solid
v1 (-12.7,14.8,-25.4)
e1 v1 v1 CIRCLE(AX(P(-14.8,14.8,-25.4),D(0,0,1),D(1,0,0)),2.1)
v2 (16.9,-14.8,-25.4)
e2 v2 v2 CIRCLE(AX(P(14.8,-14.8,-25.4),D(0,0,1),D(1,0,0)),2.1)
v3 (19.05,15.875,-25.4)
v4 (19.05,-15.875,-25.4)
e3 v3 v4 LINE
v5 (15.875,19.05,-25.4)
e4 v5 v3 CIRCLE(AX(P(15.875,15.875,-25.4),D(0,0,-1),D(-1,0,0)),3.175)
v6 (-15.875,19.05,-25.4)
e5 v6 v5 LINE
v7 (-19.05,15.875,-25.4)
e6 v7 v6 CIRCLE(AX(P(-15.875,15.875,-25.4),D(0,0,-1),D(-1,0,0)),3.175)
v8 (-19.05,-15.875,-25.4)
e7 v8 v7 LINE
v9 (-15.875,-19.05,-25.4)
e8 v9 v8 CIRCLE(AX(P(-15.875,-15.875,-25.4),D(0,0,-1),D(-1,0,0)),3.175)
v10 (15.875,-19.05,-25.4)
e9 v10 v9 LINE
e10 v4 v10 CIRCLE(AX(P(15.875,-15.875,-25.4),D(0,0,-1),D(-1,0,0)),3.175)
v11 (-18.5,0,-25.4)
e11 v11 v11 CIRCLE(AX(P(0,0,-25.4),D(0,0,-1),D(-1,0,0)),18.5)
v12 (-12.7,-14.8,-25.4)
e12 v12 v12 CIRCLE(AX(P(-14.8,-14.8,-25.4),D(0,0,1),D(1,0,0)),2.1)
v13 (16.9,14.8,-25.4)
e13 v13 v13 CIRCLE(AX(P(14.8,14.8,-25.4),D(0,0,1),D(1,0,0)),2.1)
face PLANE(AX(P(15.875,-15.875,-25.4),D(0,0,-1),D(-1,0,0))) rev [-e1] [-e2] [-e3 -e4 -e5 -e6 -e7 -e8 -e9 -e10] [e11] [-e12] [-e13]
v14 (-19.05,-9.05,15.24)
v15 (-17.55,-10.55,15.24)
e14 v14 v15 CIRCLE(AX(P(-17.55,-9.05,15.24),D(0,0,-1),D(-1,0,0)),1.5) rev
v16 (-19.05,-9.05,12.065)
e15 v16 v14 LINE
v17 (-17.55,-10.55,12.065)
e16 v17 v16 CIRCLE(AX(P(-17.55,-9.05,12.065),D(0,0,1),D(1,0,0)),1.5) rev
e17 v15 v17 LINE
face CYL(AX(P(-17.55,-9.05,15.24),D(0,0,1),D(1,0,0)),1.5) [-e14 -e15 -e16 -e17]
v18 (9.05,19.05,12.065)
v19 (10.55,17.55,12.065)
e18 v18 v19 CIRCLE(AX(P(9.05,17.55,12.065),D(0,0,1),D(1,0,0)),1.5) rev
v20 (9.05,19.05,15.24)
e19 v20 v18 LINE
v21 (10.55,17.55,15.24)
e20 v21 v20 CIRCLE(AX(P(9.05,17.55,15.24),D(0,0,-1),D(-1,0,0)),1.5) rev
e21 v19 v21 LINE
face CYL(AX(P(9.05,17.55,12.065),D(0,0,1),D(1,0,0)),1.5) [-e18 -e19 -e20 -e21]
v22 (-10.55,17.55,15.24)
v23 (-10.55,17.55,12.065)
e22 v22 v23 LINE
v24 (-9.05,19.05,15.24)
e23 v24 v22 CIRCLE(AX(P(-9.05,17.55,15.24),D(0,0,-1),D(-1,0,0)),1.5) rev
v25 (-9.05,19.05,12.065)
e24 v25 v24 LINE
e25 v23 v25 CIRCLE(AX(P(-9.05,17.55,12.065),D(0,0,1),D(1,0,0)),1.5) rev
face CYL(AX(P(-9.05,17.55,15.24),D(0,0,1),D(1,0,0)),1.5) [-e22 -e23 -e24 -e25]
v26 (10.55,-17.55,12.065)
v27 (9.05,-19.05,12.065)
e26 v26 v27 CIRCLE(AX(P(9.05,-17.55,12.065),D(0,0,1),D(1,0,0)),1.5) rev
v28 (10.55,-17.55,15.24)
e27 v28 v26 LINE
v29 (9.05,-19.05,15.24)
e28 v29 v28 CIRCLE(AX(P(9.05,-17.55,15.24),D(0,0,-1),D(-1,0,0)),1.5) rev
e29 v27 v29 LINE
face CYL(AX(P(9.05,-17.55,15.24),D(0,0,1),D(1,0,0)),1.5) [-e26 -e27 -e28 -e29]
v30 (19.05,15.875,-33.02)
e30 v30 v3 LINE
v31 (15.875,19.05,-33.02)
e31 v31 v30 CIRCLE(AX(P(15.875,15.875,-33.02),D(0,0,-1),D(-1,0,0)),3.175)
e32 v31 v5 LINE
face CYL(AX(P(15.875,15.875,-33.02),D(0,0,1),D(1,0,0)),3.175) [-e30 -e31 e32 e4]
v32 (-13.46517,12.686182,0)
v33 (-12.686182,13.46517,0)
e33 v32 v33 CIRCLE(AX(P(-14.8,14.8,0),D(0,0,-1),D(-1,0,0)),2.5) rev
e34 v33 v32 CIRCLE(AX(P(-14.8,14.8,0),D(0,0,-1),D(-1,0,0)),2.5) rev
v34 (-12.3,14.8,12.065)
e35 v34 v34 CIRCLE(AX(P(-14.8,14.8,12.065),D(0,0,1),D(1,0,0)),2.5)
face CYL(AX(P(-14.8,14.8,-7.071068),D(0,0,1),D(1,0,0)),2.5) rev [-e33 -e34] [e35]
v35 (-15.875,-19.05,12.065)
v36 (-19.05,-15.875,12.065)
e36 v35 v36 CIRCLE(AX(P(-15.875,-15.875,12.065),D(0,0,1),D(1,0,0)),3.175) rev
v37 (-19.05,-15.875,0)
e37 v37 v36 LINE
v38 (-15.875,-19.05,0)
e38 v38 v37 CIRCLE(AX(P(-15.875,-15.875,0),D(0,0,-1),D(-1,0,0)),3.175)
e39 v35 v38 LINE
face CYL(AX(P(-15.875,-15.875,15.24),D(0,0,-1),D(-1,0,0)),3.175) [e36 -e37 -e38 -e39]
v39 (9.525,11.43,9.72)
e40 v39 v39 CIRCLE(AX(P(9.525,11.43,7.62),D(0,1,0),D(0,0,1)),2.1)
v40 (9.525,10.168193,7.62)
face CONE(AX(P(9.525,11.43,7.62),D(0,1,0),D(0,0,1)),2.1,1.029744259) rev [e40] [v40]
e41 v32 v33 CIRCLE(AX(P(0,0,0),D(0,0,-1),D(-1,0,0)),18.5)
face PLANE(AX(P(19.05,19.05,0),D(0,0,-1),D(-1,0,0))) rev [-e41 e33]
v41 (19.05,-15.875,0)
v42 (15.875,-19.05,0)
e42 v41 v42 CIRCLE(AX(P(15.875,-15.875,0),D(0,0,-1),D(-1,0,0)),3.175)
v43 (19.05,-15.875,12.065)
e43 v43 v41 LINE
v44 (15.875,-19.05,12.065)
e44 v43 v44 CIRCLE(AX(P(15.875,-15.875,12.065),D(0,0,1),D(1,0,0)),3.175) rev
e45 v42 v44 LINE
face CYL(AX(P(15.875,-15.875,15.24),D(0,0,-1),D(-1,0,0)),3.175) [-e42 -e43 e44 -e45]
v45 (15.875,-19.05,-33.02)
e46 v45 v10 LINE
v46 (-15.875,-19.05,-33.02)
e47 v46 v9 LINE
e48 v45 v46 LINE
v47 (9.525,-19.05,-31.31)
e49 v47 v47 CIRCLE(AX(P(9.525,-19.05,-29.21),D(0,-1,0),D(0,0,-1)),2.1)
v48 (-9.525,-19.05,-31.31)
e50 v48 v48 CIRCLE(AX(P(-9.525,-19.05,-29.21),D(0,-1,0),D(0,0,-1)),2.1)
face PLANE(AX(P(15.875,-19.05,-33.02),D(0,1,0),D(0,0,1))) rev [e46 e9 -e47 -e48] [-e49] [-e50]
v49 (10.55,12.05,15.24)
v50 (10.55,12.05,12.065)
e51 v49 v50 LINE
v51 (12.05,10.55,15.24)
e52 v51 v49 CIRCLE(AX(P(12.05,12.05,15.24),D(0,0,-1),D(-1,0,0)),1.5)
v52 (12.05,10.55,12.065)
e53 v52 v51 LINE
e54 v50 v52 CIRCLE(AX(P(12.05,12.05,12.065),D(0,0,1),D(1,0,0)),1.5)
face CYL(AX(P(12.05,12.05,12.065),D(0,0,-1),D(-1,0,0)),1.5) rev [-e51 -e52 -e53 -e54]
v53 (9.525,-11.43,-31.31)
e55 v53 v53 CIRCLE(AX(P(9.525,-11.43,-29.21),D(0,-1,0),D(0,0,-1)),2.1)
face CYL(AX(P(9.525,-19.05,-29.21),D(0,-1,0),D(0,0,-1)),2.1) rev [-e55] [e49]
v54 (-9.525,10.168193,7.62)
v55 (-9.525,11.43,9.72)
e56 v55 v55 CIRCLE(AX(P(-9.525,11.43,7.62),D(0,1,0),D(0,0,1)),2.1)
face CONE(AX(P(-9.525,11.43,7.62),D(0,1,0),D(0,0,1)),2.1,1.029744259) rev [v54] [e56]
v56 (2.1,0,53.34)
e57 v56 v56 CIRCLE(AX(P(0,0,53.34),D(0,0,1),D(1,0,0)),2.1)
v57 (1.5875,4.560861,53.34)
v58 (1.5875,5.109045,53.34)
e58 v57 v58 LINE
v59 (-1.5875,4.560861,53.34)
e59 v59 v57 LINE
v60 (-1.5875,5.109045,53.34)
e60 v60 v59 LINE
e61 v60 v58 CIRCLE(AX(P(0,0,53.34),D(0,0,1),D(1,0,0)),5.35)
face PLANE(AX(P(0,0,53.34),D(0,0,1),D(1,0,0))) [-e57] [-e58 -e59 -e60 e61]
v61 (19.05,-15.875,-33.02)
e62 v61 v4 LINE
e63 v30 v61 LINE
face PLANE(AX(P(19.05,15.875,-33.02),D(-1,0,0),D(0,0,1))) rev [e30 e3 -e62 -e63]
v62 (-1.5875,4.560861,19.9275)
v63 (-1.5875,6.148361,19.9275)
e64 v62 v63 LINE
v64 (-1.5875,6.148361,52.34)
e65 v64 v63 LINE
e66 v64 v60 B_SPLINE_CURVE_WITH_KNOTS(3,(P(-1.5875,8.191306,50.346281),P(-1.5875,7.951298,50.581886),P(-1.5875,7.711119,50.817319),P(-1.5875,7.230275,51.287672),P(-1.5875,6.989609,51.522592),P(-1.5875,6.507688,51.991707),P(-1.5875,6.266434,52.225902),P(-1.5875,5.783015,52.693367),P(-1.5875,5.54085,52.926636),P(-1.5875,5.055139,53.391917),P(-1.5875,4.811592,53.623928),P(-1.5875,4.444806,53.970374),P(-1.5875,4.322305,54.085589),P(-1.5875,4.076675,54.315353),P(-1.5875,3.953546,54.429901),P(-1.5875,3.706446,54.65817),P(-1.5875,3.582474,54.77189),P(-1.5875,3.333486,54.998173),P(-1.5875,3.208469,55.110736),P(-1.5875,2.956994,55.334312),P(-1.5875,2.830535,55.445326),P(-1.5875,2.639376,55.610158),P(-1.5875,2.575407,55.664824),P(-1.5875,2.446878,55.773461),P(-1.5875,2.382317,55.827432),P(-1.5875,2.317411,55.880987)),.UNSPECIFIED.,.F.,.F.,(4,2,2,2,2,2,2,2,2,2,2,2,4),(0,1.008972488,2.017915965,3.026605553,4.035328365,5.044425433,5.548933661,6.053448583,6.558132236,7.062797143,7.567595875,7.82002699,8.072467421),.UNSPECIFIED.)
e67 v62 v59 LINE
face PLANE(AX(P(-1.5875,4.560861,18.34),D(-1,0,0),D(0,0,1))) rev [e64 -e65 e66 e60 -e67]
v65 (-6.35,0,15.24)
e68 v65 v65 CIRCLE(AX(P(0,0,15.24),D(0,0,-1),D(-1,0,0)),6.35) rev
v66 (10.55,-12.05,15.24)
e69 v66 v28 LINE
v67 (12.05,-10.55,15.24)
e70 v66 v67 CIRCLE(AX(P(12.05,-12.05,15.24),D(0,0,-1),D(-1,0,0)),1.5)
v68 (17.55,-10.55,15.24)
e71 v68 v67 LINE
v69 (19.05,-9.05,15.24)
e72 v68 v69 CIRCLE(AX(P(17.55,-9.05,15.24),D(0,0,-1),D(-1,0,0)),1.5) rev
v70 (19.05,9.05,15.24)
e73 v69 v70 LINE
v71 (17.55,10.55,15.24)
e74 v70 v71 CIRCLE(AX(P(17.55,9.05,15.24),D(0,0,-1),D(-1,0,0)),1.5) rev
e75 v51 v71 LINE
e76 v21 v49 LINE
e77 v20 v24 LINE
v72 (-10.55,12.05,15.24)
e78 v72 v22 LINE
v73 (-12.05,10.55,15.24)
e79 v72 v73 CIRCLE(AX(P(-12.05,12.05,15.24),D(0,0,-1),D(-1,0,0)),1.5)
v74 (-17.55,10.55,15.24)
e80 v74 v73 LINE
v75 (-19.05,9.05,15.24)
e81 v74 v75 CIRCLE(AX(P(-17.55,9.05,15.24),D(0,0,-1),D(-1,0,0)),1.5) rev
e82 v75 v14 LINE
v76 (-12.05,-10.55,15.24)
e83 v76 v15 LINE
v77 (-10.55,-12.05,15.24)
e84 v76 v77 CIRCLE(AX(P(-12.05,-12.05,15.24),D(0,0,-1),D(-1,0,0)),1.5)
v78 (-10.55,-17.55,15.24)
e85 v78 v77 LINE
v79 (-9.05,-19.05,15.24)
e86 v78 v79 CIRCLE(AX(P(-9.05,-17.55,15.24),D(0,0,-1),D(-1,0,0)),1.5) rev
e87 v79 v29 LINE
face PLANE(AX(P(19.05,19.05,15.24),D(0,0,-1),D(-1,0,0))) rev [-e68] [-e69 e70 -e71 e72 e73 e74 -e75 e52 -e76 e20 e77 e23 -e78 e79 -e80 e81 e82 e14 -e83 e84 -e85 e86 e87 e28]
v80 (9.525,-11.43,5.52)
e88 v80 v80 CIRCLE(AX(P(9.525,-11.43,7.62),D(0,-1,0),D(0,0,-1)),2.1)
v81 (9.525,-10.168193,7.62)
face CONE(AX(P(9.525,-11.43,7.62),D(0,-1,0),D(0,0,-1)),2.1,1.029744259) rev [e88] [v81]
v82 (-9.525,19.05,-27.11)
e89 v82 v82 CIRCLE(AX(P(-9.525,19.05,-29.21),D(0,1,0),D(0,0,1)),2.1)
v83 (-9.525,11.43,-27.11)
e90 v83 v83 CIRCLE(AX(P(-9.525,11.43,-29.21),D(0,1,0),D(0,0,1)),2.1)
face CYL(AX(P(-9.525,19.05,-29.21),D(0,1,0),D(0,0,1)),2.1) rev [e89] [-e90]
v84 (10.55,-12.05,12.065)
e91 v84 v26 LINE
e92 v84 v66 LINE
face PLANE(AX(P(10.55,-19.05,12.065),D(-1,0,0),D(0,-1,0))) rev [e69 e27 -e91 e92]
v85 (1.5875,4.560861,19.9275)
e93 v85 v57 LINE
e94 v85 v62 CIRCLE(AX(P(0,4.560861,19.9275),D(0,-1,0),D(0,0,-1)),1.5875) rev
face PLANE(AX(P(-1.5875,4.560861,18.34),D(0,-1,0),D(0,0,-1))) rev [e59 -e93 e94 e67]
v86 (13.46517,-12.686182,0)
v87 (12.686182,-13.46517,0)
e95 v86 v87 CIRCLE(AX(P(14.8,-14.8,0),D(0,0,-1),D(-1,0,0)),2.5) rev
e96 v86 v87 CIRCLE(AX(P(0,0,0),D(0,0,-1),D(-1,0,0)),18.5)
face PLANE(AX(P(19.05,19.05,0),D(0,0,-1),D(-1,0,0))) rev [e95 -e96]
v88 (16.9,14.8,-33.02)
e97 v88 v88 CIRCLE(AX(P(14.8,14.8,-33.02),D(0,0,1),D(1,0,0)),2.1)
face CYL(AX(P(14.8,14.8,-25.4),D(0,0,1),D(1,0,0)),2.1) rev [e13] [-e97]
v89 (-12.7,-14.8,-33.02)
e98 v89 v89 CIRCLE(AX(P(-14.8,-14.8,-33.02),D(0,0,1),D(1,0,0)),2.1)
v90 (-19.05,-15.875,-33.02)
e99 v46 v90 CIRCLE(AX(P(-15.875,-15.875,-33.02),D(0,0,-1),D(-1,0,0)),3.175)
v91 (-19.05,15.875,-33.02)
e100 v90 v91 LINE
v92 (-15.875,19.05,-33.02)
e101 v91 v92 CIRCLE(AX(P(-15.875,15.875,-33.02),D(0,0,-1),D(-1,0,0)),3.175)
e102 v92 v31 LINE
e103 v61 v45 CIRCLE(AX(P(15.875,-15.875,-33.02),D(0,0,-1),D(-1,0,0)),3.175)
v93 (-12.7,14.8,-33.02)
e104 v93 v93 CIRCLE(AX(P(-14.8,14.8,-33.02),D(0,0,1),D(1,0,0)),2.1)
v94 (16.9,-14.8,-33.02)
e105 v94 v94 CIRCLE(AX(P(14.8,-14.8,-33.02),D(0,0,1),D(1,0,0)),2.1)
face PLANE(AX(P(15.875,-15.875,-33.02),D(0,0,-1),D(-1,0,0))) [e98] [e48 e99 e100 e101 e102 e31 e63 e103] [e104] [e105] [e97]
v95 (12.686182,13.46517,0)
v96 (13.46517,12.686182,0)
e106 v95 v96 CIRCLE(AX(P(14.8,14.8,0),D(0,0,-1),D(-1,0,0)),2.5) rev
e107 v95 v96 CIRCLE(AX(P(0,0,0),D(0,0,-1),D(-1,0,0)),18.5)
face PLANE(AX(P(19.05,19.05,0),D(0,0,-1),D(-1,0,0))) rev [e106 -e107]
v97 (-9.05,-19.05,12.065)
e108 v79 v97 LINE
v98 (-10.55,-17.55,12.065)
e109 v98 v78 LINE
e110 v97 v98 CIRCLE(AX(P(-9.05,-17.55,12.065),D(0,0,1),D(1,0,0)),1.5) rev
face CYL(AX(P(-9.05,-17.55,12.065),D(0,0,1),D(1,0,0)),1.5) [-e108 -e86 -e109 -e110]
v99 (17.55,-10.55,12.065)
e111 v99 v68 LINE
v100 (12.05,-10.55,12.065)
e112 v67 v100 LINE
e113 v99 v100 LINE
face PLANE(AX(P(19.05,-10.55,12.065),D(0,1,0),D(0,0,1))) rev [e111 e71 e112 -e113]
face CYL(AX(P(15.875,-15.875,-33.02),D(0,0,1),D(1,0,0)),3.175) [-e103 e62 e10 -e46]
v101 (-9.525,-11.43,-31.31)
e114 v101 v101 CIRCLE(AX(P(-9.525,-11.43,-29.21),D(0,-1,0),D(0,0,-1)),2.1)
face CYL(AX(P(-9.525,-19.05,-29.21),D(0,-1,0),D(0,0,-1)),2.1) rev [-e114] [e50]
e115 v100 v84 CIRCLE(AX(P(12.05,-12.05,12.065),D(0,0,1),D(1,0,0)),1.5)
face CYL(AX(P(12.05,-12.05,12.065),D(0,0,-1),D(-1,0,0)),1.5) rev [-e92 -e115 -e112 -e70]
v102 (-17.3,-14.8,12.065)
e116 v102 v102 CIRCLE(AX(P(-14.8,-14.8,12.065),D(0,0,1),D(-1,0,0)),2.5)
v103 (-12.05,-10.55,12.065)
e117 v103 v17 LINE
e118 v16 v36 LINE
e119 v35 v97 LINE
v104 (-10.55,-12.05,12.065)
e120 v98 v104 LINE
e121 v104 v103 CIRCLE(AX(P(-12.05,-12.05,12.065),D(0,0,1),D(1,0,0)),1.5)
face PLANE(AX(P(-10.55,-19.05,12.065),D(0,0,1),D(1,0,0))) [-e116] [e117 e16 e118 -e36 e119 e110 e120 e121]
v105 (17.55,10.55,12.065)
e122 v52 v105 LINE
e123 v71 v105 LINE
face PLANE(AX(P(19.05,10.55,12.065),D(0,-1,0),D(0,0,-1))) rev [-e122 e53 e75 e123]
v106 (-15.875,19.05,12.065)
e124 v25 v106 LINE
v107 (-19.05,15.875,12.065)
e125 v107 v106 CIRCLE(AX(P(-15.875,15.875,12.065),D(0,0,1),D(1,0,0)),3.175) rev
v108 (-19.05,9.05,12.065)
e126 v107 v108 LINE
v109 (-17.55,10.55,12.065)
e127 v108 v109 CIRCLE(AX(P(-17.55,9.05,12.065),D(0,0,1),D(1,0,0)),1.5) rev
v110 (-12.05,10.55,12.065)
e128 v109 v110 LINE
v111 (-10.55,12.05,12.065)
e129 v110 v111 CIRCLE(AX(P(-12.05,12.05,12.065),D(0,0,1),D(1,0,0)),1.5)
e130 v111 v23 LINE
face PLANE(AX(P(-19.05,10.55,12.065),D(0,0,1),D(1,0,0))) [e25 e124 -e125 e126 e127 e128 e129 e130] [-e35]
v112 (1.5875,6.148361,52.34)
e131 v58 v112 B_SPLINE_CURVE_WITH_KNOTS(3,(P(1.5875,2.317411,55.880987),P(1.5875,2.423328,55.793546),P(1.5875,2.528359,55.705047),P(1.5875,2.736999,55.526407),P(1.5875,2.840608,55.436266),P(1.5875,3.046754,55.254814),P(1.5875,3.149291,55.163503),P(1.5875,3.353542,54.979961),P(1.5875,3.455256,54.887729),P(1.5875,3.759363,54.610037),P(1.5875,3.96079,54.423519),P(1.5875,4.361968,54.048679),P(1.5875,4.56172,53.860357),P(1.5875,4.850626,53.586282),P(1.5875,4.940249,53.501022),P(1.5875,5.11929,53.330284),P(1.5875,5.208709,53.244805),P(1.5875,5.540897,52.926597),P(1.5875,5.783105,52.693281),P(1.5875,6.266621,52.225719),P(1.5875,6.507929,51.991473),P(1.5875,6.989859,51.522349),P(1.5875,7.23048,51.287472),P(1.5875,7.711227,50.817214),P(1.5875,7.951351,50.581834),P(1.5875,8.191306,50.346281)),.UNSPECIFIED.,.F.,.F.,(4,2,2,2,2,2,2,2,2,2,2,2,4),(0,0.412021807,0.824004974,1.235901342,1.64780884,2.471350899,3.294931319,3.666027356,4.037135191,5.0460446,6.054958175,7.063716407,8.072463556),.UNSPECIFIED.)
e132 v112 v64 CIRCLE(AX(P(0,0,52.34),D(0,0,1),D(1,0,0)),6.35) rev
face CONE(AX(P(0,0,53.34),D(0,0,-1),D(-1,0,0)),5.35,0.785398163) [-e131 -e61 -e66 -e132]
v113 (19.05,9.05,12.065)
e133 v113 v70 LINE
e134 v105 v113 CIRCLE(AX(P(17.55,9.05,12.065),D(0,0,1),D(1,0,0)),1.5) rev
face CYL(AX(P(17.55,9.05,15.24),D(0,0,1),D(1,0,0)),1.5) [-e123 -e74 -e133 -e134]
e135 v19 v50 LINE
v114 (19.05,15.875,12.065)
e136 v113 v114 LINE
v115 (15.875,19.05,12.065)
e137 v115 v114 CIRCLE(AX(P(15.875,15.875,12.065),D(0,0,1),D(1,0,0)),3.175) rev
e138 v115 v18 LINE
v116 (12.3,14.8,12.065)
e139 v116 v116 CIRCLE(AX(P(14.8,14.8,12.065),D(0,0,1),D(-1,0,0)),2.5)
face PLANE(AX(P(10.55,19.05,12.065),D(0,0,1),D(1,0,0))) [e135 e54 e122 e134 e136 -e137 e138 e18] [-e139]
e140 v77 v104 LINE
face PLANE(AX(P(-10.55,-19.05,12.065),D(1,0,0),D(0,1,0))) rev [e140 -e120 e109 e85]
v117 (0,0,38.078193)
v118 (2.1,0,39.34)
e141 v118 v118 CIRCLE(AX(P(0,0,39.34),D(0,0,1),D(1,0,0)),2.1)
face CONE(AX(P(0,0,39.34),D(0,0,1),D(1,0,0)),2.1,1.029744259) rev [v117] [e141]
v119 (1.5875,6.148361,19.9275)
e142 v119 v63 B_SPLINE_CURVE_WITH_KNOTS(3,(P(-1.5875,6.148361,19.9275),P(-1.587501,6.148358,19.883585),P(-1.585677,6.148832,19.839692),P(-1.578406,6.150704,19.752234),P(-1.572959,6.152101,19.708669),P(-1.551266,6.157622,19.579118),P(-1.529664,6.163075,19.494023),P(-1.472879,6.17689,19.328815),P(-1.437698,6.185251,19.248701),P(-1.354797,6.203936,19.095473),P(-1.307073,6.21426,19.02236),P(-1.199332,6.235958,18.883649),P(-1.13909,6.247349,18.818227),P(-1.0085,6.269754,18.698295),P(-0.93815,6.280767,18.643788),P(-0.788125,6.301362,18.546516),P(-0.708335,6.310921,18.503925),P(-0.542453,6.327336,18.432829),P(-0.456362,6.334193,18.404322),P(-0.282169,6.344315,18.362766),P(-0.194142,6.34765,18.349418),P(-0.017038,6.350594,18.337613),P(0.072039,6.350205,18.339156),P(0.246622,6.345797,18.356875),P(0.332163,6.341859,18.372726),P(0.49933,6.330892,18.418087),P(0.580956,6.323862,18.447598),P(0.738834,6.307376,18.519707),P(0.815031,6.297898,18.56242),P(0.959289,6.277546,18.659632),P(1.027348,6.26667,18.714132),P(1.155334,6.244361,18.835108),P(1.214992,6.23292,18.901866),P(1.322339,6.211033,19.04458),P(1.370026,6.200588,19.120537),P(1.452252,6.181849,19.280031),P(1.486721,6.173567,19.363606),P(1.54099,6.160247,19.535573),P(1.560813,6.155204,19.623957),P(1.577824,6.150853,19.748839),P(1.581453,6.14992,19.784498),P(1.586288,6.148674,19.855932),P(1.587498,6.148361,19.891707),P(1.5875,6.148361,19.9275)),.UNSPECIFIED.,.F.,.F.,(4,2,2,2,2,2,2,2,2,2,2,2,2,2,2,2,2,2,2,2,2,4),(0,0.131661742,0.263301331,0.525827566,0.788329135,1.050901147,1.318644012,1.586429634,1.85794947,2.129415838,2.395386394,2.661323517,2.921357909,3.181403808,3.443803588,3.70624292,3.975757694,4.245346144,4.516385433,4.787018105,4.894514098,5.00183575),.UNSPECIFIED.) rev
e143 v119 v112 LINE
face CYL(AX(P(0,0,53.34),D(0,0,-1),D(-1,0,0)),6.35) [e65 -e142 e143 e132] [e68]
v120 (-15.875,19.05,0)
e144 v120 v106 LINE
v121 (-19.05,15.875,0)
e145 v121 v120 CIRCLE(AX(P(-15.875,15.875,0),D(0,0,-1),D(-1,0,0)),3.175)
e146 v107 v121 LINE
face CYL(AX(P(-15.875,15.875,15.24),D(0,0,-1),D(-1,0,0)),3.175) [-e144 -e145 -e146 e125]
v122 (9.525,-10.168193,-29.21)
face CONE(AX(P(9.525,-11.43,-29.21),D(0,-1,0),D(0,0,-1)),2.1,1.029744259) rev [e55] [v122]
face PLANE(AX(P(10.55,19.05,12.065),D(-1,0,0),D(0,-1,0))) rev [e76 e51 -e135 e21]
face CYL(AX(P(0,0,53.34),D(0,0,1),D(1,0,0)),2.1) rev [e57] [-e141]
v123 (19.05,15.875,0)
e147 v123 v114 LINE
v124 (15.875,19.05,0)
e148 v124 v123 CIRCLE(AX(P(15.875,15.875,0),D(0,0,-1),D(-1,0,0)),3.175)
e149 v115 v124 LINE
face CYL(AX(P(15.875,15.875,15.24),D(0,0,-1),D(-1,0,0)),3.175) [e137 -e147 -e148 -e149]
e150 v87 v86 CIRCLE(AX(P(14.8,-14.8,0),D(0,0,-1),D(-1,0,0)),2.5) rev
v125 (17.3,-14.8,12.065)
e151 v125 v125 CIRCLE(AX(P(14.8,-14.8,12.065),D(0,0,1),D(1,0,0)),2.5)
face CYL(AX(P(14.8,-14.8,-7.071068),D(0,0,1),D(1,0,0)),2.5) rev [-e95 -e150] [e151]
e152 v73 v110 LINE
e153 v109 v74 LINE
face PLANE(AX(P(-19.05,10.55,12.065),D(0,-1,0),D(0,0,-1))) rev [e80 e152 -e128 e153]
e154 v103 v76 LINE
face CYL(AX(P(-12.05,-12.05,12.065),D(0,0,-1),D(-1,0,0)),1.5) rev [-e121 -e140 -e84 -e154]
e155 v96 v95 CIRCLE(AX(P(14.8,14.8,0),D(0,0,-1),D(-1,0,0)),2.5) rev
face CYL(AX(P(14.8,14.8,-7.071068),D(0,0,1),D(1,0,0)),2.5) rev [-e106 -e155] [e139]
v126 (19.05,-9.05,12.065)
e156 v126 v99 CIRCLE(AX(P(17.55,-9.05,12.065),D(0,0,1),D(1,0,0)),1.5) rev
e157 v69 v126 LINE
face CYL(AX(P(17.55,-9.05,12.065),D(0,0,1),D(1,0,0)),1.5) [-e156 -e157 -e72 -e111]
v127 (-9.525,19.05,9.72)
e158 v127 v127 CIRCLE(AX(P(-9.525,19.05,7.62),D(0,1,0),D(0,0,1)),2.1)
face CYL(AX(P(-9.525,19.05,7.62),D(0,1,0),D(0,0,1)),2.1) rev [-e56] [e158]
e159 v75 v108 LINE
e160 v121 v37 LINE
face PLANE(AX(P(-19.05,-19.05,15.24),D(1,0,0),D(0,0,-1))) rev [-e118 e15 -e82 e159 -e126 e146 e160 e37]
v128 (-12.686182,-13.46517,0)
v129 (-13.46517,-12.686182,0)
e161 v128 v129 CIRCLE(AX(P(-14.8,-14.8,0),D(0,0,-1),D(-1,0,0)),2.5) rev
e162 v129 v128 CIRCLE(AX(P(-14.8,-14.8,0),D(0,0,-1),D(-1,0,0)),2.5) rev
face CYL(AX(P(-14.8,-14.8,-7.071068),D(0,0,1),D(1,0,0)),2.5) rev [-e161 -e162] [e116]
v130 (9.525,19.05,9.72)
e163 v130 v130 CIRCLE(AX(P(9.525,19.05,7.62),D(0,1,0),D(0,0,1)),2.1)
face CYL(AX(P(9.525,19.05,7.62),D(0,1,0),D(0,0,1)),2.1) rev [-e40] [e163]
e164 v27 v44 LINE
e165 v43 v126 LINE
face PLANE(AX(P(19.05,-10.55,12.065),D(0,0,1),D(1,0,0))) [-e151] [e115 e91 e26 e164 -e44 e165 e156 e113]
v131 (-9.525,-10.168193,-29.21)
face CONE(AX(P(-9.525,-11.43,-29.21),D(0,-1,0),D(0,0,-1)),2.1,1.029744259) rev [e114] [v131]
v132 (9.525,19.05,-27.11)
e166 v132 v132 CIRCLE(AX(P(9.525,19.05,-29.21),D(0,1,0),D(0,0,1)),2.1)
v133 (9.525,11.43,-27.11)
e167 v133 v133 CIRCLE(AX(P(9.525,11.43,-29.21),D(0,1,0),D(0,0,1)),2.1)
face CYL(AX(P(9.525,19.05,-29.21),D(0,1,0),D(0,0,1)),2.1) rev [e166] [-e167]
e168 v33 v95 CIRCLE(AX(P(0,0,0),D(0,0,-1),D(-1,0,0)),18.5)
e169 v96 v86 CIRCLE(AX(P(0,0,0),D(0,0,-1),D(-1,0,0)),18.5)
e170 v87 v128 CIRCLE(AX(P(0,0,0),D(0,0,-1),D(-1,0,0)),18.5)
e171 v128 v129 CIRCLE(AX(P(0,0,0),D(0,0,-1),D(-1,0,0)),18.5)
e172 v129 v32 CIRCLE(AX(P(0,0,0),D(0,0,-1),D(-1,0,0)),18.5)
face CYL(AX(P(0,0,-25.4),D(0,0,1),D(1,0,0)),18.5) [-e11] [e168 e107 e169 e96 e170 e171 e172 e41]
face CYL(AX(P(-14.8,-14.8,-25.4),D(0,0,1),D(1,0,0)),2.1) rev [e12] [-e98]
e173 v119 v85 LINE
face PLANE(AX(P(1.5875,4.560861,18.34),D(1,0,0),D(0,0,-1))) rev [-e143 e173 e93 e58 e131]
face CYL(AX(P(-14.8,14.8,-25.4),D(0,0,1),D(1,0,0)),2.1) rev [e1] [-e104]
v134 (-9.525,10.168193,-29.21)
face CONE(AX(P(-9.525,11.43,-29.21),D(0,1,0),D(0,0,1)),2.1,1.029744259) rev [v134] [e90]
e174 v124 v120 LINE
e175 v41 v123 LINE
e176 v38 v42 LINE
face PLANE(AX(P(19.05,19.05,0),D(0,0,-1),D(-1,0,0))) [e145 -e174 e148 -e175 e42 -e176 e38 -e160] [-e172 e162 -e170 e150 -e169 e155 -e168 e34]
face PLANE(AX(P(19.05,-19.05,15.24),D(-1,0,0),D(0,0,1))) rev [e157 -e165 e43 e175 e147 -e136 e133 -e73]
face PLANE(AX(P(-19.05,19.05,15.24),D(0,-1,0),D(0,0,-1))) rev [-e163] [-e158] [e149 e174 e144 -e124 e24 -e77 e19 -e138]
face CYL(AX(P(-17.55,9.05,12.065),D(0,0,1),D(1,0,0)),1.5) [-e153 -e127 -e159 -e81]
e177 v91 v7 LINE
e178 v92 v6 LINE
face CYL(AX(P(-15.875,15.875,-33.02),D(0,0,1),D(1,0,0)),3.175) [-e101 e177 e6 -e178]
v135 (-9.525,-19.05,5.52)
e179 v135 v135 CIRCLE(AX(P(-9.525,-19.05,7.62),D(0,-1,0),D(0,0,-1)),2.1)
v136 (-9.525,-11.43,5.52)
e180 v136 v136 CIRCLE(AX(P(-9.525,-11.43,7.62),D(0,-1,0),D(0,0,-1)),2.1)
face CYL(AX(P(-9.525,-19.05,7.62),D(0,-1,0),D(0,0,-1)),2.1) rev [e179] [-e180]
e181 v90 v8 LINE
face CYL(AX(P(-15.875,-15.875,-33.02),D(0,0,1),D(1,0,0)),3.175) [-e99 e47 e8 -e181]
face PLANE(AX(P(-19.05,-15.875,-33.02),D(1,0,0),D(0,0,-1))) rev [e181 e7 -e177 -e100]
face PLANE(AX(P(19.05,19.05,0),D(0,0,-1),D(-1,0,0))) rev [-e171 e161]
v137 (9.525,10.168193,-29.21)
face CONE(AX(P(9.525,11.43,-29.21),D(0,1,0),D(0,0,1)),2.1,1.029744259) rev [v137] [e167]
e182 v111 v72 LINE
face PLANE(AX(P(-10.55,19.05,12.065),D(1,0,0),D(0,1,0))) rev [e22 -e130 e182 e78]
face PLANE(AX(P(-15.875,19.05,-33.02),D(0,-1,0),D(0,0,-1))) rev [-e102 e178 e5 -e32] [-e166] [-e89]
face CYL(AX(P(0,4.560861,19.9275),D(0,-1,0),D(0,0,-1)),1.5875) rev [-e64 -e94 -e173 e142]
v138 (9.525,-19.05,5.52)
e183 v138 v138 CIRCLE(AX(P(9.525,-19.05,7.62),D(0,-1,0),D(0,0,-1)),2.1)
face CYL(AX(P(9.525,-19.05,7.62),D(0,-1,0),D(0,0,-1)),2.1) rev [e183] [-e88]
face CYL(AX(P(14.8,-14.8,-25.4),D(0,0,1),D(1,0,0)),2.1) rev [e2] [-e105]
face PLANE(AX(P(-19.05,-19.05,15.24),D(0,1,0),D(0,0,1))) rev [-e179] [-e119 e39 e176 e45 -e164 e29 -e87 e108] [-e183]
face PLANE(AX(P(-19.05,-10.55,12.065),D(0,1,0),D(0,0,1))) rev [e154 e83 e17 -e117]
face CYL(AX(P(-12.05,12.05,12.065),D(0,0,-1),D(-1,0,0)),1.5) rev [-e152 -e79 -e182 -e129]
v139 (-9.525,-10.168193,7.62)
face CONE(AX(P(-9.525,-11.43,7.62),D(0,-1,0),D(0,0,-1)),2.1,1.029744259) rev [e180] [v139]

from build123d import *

# Parameters (mm, degrees)
SKETCH1_W                      = 38.1
SKETCH1_H                      = 38.1
EXTRUDE1_DEPTH                 = 15.24
FILLET1_R                      = 3.175
SKETCH2_R                      = 6.35
EXTRUDE2_DEPTH                 = 38.1
CHAMFER1_SIZE                  = 1
SKETCH3_W                      = 3.175
SKETCH3_H                      = 3.175
EXTRUDE3_DEPTH                 = 35
FILLET2_R                      = 1.5875
M5X0_8_TAPPED_HOLE1_D          = 4.2
M5X0_8_TAPPED_HOLE1_DEPTH      = 14
M5X0_8_TAPPED_HOLE1_TIP        = 1.2618073
SKETCH7_R                      = 18.5
EXTRUDE4_DEPTH                 = 25.4
EXTRUDE5_DEPTH                 = 7.62
SKETCH9_W                      = 8.5
SKETCH9_H                      = 8.5
EXTRUDE7_DEPTH                 = 3.175
FILLET3_R                      = 1.5
SKETCH10_R                     = 2.5
EXTRUDE8_DEPTH                 = 12.065
M5X0_8_TAPPED_HOLE2_D          = 4.2
M5X0_8_TAPPED_HOLE3_AT_2_COUNT = 2
M5X0_8_TAPPED_HOLE3_AT_2_PITCH = 19.05
M5X0_8_TAPPED_HOLE3_AT_3_COUNT = 2
M5X0_8_TAPPED_HOLE3_AT_3_PITCH = 36.83
M5X0_8_TAPPED_HOLE3_AT_4_COUNT = 2
M5X0_8_TAPPED_HOLE3_AT_4_PITCH = 41.465062402


with BuildPart() as part:
    # Sketch1 → Extrude1 (new body)
    with BuildSketch(Plane.XY):
        Rectangle(SKETCH1_W, SKETCH1_H)
    extrude(amount=EXTRUDE1_DEPTH)

    # Fillet1
    fillet1_edges = [part.edges().sort_by_distance(p)[0] for p in [
        (19.05, -19.05, 7.62),
        (-19.05, -19.05, 7.62),
        (-19.05, 19.05, 7.62),
        (19.05, 19.05, 7.62),
    ]]
    fillet(fillet1_edges, radius=FILLET1_R)

    # Sketch2 → Extrude2 (add)
    with BuildSketch(Plane.XY.offset(15.24)):
        with Locations(Location((0, 0, 0), (0, 0, 180))):
            Circle(SKETCH2_R)
    extrude(amount=EXTRUDE2_DEPTH)

    # Chamfer1
    chamfer1_edges = [part.edges().sort_by_distance(p)[0] for p in [
        (6.35, 0, 53.34),
    ]]
    chamfer(chamfer1_edges, length=CHAMFER1_SIZE)

    # Sketch3 → Extrude3 (cut)
    with BuildSketch(Plane.XY.offset(53.34)):
        with Locations((0, 6.148361062)):
            Rectangle(SKETCH3_W, SKETCH3_H)
    extrude(amount=-EXTRUDE3_DEPTH, mode=Mode.SUBTRACT)

    # Fillet2
    fillet2_edges = [part.edges().sort_by_distance(p)[0] for p in [
        (1.5875, 5.354611062, 18.34),
        (-1.5875, 5.354611062, 18.34),
    ]]
    fillet(fillet2_edges, radius=FILLET2_R - 0.0001)  # a hair under: the kernel refuses the full size

    # M5x0.8 Tapped Hole1
    with Locations(Plane.XY.offset(53.34)):
        with Locations((0, 0)):
            Hole(M5X0_8_TAPPED_HOLE1_D / 2, depth=M5X0_8_TAPPED_HOLE1_DEPTH)
            with Locations((0, 0, -(M5X0_8_TAPPED_HOLE1_DEPTH + M5X0_8_TAPPED_HOLE1_TIP / 2))):  # 118° drill point
                Cone(0, M5X0_8_TAPPED_HOLE1_D / 2, M5X0_8_TAPPED_HOLE1_TIP, mode=Mode.SUBTRACT)

    # Sketch7 → Extrude4 (add)
    with BuildSketch(Plane(origin=(0, 0, 0), x_dir=(-1, 0, 0), z_dir=(0, 0, -1))):
        Circle(SKETCH7_R)
    extrude(amount=EXTRUDE4_DEPTH)

    # Sketch8 → Extrude5 (add)
    with BuildSketch(Plane(origin=(0, 0, -25.4), x_dir=(-1, 0, 0), z_dir=(0, 0, -1))):
        with BuildLine():
            Line((-15.875, -19.05), (15.875, -19.05))
            ThreePointArc((15.875, -19.05), (18.12006403, -18.12006403), (19.05, -15.875))
            Line((19.05, -15.875), (19.05, 15.875))
            ThreePointArc((19.05, 15.875), (18.12006403, 18.12006403), (15.875, 19.05))
            Line((15.875, 19.05), (-15.875, 19.05))
            ThreePointArc((-15.875, 19.05), (-18.12006403, 18.12006403), (-19.05, 15.875))
            Line((-19.05, 15.875), (-19.05, -15.875))
            ThreePointArc((-19.05, -15.875), (-18.12006403, -18.12006403), (-15.875, -19.05))
        make_face()
    extrude(amount=EXTRUDE5_DEPTH)

    # Sketch9 → Extrude7 (cut)
    with BuildSketch(Plane.XY.offset(15.24)):
        with Locations((-14.8, 14.8)):
            Rectangle(SKETCH9_W, SKETCH9_H)
        with Locations((14.8, 14.8)):
            Rectangle(SKETCH9_W, SKETCH9_H)
        with Locations((14.8, -14.8)):
            Rectangle(SKETCH9_W, SKETCH9_H)
        with Locations((-14.8, -14.8)):
            Rectangle(SKETCH9_W, SKETCH9_H)
    extrude(amount=-EXTRUDE7_DEPTH, mode=Mode.SUBTRACT)

    # Fillet3
    fillet3_edges = [part.edges().sort_by_distance(p)[0] for p in [
        (-19.05, 10.55, 13.6525),
        (-10.55, 19.05, 13.6525),
        (-10.55, 10.55, 13.6525),
        (10.55, 19.05, 13.6525),
        (19.05, 10.55, 13.6525),
        (10.55, 10.55, 13.6525),
        (19.05, -10.55, 13.6525),
        (10.55, -19.05, 13.6525),
        (10.55, -10.55, 13.6525),
        (-10.55, -19.05, 13.6525),
        (-19.05, -10.55, 13.6525),
        (-10.55, -10.55, 13.6525),
    ]]
    fillet(fillet3_edges, radius=FILLET3_R)

    # Sketch10 → Extrude8 (cut)
    with BuildSketch(Plane.XY.offset(12.065)):
        with Locations((-14.8, 14.8)):
            Circle(SKETCH10_R)
        with Locations(Location((-14.8, -14.8, 0), (0, 0, 32.271518342))):
            Circle(SKETCH10_R)
        with Locations((14.8, -14.8)):
            Circle(SKETCH10_R)
        with Locations(Location((14.8, 14.8, 0), (0, 0, 237.728481658))):
            Circle(SKETCH10_R)
    extrude(amount=-EXTRUDE8_DEPTH, mode=Mode.SUBTRACT)

    # M5x0.8 Tapped Hole2 (through all)
    with Locations(Plane.XY.offset(-25.4)):
        with Locations((-14.8, 14.8), (14.8, 14.8), (14.8, -14.8), (-14.8, -14.8)):
            Hole(M5X0_8_TAPPED_HOLE2_D / 2)

    # Sketch13 → M5x0.8 Tapped Hole3 (revolve, cut)
    with BuildSketch(Plane(origin=(-9.525, 19.05, -29.21), x_dir=(0, 0, 1), z_dir=(1, 0, 0))):
        Polygon((0, 0), (0, 8.8818073), (2.1, 7.62), (2.1, 0), align=None)
    m5x0_8_tapped_hole3 = revolve(axis=Axis((-9.525, 25.4, -29.21), (0, -1, 0)), mode=Mode.SUBTRACT)

    # M5x0.8 Tapped Hole3 at 2: M5x0.8 Tapped Hole3 ×2
    with Locations(*[(i * M5X0_8_TAPPED_HOLE3_AT_2_PITCH, 0, 0) for i in range(1, M5X0_8_TAPPED_HOLE3_AT_2_COUNT)]):
        add(m5x0_8_tapped_hole3, mode=Mode.SUBTRACT)

    # M5x0.8 Tapped Hole3 at 3: M5x0.8 Tapped Hole3 ×2
    with Locations(*[(0, 0, i * M5X0_8_TAPPED_HOLE3_AT_3_PITCH) for i in range(1, M5X0_8_TAPPED_HOLE3_AT_3_COUNT)]):
        add(m5x0_8_tapped_hole3, mode=Mode.SUBTRACT)

    # M5x0.8 Tapped Hole3 at 4: M5x0.8 Tapped Hole3 ×2
    with Locations(*[Vector(0.4594229188737666, 0, 0.8882176431559489) * (i * M5X0_8_TAPPED_HOLE3_AT_4_PITCH) for i in range(1, M5X0_8_TAPPED_HOLE3_AT_4_COUNT)]):
        add(m5x0_8_tapped_hole3, mode=Mode.SUBTRACT)

    # Mirror2: M5x0.8 Tapped Hole3 across plane
    add(m5x0_8_tapped_hole3.mirror(Plane.ZX), mode=Mode.SUBTRACT)

    # Mirror2 copy 1 sketch → Mirror2 copy 1 (revolve, cut)
    with BuildSketch(Plane(origin=(9.525, -19.05, -29.21), x_dir=(0, 0, 1), z_dir=(1, 0, 0))):
        Polygon((0, 0), (0, -8.8818073), (2.1, -7.62), (2.1, 0), align=None)
    revolve(axis=Axis((9.525, -25.4, -29.21), (0, -1, 0)), mode=Mode.SUBTRACT)

    # Mirror2 copy 2 sketch → Mirror2 copy 2 (revolve, cut)
    with BuildSketch(Plane(origin=(-9.525, -19.05, 7.62), x_dir=(0, 0, 1), z_dir=(1, 0, 0))):
        Polygon((0, 0), (0, -8.8818073), (2.1, -7.62), (2.1, 0), align=None)
    revolve(axis=Axis((-9.525, -25.4, 7.62), (0, -1, 0)), mode=Mode.SUBTRACT)

    # Mirror2 copy 3 sketch → Mirror2 copy 3 (revolve, cut)
    with BuildSketch(Plane(origin=(9.525, -19.05, 7.62), x_dir=(0, 0, 1), z_dir=(1, 0, 0))):
        Polygon((0, 0), (0, -8.8818073), (2.1, -7.62), (2.1, 0), align=None)
    revolve(axis=Axis((9.525, -25.4, 7.62), (0, -1, 0)), mode=Mode.SUBTRACT)


solid = part.part
